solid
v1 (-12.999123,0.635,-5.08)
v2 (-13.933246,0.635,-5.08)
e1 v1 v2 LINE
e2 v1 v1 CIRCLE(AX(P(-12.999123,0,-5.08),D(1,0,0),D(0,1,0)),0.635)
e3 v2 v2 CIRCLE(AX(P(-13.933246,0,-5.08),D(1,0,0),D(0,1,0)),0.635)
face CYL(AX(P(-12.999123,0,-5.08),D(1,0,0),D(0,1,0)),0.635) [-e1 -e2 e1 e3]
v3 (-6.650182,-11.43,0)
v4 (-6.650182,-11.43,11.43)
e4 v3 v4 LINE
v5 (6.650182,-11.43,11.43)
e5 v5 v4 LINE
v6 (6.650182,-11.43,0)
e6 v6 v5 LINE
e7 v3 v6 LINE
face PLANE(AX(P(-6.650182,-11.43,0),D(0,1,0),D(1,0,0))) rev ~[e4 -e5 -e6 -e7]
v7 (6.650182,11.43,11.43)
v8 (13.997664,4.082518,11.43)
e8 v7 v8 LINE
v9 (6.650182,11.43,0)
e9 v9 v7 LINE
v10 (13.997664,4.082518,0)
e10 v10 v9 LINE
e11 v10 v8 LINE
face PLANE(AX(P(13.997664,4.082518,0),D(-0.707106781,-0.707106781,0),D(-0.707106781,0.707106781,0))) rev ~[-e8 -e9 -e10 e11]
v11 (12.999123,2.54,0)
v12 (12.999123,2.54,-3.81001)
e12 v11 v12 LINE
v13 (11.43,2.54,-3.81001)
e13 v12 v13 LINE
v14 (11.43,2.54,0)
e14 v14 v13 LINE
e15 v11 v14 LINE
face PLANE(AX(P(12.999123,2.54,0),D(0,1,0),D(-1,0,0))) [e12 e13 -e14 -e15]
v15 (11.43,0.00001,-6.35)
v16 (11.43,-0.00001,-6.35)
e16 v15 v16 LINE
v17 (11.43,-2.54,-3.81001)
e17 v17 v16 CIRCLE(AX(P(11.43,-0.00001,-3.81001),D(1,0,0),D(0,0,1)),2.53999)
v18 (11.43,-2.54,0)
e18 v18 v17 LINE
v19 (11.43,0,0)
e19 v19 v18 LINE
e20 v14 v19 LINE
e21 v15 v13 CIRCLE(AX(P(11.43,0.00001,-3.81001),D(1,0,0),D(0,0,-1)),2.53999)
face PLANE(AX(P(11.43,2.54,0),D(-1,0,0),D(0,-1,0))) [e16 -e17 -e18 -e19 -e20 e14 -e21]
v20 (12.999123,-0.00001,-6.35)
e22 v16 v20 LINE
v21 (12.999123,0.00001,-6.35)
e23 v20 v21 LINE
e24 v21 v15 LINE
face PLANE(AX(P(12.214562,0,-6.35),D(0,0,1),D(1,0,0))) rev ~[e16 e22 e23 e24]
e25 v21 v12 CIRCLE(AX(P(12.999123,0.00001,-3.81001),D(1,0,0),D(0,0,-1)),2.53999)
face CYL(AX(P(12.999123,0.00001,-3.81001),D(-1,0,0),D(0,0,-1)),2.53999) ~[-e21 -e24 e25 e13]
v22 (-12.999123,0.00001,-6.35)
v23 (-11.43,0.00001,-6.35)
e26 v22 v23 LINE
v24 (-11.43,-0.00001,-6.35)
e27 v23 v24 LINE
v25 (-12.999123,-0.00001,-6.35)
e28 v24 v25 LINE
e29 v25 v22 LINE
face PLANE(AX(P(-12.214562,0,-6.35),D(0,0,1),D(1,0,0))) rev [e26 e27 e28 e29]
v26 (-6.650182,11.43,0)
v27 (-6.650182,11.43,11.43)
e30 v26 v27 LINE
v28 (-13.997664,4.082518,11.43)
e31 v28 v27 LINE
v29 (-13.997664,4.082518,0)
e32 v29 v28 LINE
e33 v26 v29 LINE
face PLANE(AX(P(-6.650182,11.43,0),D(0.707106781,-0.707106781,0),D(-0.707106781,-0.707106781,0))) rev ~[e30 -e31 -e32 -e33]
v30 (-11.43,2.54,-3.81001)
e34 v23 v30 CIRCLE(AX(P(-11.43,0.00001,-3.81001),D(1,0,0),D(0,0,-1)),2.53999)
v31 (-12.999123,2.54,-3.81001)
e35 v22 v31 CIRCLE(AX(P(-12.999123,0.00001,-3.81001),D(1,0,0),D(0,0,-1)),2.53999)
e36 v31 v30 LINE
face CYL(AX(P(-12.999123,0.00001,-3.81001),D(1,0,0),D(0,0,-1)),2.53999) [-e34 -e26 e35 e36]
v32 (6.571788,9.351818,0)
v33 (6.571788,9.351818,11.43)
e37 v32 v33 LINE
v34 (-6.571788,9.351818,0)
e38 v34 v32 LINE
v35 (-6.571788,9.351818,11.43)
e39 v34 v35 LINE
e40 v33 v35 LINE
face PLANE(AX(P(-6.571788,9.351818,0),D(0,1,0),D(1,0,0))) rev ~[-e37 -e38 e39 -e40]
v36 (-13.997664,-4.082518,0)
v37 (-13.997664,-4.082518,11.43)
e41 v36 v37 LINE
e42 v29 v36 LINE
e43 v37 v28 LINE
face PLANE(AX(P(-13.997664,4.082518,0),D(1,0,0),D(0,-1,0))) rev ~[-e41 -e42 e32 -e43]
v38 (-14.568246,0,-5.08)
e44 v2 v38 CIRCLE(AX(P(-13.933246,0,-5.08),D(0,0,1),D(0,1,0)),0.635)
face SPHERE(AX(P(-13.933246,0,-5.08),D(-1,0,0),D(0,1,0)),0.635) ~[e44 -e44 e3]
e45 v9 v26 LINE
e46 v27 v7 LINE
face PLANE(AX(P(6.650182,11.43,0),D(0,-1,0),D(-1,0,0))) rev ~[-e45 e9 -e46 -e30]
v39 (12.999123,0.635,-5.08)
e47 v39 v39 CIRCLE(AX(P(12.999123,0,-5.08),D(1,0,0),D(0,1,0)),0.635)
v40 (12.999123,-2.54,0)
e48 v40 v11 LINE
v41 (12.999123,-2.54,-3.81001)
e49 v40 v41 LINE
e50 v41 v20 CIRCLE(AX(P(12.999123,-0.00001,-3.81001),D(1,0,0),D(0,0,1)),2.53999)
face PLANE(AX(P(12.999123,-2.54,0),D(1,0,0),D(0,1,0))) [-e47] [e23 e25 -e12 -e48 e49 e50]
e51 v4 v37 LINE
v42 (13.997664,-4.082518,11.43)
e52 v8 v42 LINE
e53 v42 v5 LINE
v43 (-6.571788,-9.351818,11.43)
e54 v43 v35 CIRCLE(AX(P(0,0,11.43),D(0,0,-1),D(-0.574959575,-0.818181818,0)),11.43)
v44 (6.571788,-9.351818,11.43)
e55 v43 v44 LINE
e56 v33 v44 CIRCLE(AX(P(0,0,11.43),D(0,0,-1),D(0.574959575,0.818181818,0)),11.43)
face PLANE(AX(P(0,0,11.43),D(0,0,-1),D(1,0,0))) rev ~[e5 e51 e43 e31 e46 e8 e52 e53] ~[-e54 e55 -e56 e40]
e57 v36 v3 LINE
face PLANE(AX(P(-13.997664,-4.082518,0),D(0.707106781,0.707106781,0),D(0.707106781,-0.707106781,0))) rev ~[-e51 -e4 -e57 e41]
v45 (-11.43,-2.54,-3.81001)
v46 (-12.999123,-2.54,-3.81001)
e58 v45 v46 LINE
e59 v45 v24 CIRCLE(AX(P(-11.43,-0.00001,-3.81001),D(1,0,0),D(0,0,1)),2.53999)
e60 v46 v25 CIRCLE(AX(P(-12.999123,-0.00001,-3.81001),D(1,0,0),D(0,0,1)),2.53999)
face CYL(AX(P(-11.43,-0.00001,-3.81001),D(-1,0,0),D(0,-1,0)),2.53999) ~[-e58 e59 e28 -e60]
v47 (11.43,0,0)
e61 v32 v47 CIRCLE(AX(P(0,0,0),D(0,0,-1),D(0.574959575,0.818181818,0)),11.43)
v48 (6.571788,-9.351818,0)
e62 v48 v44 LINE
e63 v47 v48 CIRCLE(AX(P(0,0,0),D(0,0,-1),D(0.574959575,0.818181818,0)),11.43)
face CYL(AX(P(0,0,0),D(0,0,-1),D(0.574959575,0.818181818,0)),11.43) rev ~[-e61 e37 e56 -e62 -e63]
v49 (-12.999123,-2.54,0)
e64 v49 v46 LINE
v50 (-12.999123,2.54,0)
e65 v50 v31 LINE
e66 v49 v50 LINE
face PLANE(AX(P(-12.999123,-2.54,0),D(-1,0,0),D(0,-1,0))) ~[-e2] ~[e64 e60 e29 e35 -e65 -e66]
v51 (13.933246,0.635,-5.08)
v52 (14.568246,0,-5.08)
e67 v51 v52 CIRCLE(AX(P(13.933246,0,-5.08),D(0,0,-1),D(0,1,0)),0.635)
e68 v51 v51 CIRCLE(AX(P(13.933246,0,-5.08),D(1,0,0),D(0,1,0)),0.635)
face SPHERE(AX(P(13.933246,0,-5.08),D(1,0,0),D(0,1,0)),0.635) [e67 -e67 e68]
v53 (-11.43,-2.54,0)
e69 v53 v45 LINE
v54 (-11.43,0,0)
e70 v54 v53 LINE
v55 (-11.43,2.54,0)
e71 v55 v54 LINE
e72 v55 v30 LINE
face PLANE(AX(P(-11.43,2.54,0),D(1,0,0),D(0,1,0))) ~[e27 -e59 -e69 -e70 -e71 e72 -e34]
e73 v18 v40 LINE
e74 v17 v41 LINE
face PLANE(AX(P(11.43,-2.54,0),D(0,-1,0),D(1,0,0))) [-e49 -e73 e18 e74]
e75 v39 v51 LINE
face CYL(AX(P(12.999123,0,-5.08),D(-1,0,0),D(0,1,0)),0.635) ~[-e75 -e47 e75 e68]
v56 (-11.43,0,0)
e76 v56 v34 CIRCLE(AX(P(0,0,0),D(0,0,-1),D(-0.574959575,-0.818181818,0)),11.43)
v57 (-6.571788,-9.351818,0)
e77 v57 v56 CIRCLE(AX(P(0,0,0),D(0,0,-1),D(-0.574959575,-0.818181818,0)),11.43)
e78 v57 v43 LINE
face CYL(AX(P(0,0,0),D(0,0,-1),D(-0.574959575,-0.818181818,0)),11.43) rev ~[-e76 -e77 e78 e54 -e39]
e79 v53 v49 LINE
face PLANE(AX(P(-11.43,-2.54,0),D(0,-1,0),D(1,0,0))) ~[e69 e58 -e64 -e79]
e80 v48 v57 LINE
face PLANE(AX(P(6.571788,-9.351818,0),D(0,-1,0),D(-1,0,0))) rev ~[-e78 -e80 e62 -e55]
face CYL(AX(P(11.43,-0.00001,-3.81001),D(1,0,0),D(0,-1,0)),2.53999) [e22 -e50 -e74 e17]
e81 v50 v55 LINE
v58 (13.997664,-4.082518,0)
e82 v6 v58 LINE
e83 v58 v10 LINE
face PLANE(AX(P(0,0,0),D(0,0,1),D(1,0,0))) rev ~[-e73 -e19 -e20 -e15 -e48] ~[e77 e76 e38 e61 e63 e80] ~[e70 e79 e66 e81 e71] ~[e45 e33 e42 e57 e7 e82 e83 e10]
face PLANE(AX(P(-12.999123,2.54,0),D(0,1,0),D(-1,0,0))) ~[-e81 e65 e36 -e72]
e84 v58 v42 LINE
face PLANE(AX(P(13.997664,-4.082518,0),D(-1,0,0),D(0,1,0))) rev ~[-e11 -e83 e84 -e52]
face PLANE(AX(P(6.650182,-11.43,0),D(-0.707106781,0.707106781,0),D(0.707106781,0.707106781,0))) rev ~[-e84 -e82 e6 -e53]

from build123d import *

# Parameters (mm, degrees)
F1_DEPTH  = 22.86
F3_DEPTH  = 6.35
F4_R      = 0.635
F5_DEPTH  = 1.5691231
F6_R      = 2.53999
F7_R      = 0.635
F9_DEPTH  = 6.35
F11_D     = 2.54
F16_D     = 127
F16_DEPTH = 17.781


# Not quite as in the source:
# - a fillet or chamfer is up to 0.001 mm smaller than in the source, because OpenCascade refuses the exact size
# - a length typed as a fraction of an inch, garbled in the dataset ("3 / 203.2 mm" for 3/8 in), is restored
# - the program builds the solid bodies; features that only make, move or delete a surface that nothing else refers to are left out


with BuildPart() as f1:
    # F0 (on Top) → F1 (new body)
    with BuildSketch(Plane.XY):
        Polygon((6.6501818182, 11.43), (0, 11.43), (-6.6501818182, 11.43), (-13.9976640991, 4.0825177191), (-13.9976640991, 0), (-13.9976640991, -4.0825177191), (-6.6501818182, -11.43), (0, -11.43), (6.6501818182, -11.43), (13.9976640991, -4.0825177191), (13.9976640991, 0), (13.9976640991, 4.0825177191), align=None)
        with BuildLine():
            ThreePointArc((6.5717879374, 9.3518181818), (10.1429886159, 5.26922024), (11.43, 0))
            ThreePointArc((11.43, 0), (10.1429886159, -5.26922024), (6.5717879374, -9.3518181818))
            Line((6.5717879374, -9.3518181818), (0, -9.3518181818))
            Line((0, -9.3518181818), (-6.5717879374, -9.3518181818))
            ThreePointArc((-6.5717879374, -9.3518181818), (-10.1429886159, -5.26922024), (-11.43, 0))
            ThreePointArc((-11.43, 0), (-10.1429886159, 5.26922024), (-6.5717879374, 9.3518181818))
            Line((-6.5717879374, 9.3518181818), (0, 9.3518181818))
            Line((0, 9.3518181818), (6.5717879374, 9.3518181818))
        make_face(mode=Mode.SUBTRACT)
    extrude(amount=F1_DEPTH)

    # F2 (on Top) → F3 (join)
    with BuildSketch(Plane.XY):
        Polygon((12.9991231, -2.54), (12.9991231, 0), (12.9991231, 2.54), (11.43, 2.54), (11.43, 0), (11.43, -2.54), align=None)
    extrude(amount=-F3_DEPTH)

    # F4 (on face) → F5 (join)
    with BuildSketch(Plane.YZ.offset(12.9991231)):
        with Locations((0, -5.08)):
            Circle(F4_R)
    extrude(amount=F5_DEPTH)

    # F6 (radius 2.54 in the source; OpenCascade refuses exactly that, so slightly less here)
    f6_edges = [f1.edges().sort_by_distance(p)[0] for p in [
        (12.214562, -2.54, -6.35),
        (12.214562, 2.54, -6.35),
    ]]
    fillet(f6_edges, radius=F6_R)

    # F7
    f7_edges = [f1.edges().sort_by_distance(p)[0] for p in [
        (14.568246, -0.635, -5.08),
    ]]
    fillet(f7_edges, radius=F7_R)

    # F8 (on face) → F9 (join)
    with BuildSketch(Plane.XY.offset(22.86)):
        Polygon((13.9976640991, 2.54), (12.4285360385, 2.54), (12.4285360385, 0), (12.4285360385, -2.54), (13.9976640991, -2.54), (13.9976640991, 0), align=None)
    extrude(amount=F9_DEPTH)

    # F11 (through all)
    with Locations(Plane.YZ.offset(13.9976640991)):
        with Locations((0, 26.67)):
            Hole(F11_D / 2)

    # F12: F1 across plane


with BuildPart() as f1_1:
    add(f1.part)
    add(f1.part.mirror(Plane.YZ))

    # F16 (through all, one way)
    with BuildSketch(Plane(origin=(0, 0, 11.43), x_dir=(1, 0, 0), z_dir=(0, 0, -1))):
        with Locations((0, 0)):
            Circle(F16_D / 2)
    extrude(amount=-F16_DEPTH, mode=Mode.SUBTRACT)


solid = f1_1.part
